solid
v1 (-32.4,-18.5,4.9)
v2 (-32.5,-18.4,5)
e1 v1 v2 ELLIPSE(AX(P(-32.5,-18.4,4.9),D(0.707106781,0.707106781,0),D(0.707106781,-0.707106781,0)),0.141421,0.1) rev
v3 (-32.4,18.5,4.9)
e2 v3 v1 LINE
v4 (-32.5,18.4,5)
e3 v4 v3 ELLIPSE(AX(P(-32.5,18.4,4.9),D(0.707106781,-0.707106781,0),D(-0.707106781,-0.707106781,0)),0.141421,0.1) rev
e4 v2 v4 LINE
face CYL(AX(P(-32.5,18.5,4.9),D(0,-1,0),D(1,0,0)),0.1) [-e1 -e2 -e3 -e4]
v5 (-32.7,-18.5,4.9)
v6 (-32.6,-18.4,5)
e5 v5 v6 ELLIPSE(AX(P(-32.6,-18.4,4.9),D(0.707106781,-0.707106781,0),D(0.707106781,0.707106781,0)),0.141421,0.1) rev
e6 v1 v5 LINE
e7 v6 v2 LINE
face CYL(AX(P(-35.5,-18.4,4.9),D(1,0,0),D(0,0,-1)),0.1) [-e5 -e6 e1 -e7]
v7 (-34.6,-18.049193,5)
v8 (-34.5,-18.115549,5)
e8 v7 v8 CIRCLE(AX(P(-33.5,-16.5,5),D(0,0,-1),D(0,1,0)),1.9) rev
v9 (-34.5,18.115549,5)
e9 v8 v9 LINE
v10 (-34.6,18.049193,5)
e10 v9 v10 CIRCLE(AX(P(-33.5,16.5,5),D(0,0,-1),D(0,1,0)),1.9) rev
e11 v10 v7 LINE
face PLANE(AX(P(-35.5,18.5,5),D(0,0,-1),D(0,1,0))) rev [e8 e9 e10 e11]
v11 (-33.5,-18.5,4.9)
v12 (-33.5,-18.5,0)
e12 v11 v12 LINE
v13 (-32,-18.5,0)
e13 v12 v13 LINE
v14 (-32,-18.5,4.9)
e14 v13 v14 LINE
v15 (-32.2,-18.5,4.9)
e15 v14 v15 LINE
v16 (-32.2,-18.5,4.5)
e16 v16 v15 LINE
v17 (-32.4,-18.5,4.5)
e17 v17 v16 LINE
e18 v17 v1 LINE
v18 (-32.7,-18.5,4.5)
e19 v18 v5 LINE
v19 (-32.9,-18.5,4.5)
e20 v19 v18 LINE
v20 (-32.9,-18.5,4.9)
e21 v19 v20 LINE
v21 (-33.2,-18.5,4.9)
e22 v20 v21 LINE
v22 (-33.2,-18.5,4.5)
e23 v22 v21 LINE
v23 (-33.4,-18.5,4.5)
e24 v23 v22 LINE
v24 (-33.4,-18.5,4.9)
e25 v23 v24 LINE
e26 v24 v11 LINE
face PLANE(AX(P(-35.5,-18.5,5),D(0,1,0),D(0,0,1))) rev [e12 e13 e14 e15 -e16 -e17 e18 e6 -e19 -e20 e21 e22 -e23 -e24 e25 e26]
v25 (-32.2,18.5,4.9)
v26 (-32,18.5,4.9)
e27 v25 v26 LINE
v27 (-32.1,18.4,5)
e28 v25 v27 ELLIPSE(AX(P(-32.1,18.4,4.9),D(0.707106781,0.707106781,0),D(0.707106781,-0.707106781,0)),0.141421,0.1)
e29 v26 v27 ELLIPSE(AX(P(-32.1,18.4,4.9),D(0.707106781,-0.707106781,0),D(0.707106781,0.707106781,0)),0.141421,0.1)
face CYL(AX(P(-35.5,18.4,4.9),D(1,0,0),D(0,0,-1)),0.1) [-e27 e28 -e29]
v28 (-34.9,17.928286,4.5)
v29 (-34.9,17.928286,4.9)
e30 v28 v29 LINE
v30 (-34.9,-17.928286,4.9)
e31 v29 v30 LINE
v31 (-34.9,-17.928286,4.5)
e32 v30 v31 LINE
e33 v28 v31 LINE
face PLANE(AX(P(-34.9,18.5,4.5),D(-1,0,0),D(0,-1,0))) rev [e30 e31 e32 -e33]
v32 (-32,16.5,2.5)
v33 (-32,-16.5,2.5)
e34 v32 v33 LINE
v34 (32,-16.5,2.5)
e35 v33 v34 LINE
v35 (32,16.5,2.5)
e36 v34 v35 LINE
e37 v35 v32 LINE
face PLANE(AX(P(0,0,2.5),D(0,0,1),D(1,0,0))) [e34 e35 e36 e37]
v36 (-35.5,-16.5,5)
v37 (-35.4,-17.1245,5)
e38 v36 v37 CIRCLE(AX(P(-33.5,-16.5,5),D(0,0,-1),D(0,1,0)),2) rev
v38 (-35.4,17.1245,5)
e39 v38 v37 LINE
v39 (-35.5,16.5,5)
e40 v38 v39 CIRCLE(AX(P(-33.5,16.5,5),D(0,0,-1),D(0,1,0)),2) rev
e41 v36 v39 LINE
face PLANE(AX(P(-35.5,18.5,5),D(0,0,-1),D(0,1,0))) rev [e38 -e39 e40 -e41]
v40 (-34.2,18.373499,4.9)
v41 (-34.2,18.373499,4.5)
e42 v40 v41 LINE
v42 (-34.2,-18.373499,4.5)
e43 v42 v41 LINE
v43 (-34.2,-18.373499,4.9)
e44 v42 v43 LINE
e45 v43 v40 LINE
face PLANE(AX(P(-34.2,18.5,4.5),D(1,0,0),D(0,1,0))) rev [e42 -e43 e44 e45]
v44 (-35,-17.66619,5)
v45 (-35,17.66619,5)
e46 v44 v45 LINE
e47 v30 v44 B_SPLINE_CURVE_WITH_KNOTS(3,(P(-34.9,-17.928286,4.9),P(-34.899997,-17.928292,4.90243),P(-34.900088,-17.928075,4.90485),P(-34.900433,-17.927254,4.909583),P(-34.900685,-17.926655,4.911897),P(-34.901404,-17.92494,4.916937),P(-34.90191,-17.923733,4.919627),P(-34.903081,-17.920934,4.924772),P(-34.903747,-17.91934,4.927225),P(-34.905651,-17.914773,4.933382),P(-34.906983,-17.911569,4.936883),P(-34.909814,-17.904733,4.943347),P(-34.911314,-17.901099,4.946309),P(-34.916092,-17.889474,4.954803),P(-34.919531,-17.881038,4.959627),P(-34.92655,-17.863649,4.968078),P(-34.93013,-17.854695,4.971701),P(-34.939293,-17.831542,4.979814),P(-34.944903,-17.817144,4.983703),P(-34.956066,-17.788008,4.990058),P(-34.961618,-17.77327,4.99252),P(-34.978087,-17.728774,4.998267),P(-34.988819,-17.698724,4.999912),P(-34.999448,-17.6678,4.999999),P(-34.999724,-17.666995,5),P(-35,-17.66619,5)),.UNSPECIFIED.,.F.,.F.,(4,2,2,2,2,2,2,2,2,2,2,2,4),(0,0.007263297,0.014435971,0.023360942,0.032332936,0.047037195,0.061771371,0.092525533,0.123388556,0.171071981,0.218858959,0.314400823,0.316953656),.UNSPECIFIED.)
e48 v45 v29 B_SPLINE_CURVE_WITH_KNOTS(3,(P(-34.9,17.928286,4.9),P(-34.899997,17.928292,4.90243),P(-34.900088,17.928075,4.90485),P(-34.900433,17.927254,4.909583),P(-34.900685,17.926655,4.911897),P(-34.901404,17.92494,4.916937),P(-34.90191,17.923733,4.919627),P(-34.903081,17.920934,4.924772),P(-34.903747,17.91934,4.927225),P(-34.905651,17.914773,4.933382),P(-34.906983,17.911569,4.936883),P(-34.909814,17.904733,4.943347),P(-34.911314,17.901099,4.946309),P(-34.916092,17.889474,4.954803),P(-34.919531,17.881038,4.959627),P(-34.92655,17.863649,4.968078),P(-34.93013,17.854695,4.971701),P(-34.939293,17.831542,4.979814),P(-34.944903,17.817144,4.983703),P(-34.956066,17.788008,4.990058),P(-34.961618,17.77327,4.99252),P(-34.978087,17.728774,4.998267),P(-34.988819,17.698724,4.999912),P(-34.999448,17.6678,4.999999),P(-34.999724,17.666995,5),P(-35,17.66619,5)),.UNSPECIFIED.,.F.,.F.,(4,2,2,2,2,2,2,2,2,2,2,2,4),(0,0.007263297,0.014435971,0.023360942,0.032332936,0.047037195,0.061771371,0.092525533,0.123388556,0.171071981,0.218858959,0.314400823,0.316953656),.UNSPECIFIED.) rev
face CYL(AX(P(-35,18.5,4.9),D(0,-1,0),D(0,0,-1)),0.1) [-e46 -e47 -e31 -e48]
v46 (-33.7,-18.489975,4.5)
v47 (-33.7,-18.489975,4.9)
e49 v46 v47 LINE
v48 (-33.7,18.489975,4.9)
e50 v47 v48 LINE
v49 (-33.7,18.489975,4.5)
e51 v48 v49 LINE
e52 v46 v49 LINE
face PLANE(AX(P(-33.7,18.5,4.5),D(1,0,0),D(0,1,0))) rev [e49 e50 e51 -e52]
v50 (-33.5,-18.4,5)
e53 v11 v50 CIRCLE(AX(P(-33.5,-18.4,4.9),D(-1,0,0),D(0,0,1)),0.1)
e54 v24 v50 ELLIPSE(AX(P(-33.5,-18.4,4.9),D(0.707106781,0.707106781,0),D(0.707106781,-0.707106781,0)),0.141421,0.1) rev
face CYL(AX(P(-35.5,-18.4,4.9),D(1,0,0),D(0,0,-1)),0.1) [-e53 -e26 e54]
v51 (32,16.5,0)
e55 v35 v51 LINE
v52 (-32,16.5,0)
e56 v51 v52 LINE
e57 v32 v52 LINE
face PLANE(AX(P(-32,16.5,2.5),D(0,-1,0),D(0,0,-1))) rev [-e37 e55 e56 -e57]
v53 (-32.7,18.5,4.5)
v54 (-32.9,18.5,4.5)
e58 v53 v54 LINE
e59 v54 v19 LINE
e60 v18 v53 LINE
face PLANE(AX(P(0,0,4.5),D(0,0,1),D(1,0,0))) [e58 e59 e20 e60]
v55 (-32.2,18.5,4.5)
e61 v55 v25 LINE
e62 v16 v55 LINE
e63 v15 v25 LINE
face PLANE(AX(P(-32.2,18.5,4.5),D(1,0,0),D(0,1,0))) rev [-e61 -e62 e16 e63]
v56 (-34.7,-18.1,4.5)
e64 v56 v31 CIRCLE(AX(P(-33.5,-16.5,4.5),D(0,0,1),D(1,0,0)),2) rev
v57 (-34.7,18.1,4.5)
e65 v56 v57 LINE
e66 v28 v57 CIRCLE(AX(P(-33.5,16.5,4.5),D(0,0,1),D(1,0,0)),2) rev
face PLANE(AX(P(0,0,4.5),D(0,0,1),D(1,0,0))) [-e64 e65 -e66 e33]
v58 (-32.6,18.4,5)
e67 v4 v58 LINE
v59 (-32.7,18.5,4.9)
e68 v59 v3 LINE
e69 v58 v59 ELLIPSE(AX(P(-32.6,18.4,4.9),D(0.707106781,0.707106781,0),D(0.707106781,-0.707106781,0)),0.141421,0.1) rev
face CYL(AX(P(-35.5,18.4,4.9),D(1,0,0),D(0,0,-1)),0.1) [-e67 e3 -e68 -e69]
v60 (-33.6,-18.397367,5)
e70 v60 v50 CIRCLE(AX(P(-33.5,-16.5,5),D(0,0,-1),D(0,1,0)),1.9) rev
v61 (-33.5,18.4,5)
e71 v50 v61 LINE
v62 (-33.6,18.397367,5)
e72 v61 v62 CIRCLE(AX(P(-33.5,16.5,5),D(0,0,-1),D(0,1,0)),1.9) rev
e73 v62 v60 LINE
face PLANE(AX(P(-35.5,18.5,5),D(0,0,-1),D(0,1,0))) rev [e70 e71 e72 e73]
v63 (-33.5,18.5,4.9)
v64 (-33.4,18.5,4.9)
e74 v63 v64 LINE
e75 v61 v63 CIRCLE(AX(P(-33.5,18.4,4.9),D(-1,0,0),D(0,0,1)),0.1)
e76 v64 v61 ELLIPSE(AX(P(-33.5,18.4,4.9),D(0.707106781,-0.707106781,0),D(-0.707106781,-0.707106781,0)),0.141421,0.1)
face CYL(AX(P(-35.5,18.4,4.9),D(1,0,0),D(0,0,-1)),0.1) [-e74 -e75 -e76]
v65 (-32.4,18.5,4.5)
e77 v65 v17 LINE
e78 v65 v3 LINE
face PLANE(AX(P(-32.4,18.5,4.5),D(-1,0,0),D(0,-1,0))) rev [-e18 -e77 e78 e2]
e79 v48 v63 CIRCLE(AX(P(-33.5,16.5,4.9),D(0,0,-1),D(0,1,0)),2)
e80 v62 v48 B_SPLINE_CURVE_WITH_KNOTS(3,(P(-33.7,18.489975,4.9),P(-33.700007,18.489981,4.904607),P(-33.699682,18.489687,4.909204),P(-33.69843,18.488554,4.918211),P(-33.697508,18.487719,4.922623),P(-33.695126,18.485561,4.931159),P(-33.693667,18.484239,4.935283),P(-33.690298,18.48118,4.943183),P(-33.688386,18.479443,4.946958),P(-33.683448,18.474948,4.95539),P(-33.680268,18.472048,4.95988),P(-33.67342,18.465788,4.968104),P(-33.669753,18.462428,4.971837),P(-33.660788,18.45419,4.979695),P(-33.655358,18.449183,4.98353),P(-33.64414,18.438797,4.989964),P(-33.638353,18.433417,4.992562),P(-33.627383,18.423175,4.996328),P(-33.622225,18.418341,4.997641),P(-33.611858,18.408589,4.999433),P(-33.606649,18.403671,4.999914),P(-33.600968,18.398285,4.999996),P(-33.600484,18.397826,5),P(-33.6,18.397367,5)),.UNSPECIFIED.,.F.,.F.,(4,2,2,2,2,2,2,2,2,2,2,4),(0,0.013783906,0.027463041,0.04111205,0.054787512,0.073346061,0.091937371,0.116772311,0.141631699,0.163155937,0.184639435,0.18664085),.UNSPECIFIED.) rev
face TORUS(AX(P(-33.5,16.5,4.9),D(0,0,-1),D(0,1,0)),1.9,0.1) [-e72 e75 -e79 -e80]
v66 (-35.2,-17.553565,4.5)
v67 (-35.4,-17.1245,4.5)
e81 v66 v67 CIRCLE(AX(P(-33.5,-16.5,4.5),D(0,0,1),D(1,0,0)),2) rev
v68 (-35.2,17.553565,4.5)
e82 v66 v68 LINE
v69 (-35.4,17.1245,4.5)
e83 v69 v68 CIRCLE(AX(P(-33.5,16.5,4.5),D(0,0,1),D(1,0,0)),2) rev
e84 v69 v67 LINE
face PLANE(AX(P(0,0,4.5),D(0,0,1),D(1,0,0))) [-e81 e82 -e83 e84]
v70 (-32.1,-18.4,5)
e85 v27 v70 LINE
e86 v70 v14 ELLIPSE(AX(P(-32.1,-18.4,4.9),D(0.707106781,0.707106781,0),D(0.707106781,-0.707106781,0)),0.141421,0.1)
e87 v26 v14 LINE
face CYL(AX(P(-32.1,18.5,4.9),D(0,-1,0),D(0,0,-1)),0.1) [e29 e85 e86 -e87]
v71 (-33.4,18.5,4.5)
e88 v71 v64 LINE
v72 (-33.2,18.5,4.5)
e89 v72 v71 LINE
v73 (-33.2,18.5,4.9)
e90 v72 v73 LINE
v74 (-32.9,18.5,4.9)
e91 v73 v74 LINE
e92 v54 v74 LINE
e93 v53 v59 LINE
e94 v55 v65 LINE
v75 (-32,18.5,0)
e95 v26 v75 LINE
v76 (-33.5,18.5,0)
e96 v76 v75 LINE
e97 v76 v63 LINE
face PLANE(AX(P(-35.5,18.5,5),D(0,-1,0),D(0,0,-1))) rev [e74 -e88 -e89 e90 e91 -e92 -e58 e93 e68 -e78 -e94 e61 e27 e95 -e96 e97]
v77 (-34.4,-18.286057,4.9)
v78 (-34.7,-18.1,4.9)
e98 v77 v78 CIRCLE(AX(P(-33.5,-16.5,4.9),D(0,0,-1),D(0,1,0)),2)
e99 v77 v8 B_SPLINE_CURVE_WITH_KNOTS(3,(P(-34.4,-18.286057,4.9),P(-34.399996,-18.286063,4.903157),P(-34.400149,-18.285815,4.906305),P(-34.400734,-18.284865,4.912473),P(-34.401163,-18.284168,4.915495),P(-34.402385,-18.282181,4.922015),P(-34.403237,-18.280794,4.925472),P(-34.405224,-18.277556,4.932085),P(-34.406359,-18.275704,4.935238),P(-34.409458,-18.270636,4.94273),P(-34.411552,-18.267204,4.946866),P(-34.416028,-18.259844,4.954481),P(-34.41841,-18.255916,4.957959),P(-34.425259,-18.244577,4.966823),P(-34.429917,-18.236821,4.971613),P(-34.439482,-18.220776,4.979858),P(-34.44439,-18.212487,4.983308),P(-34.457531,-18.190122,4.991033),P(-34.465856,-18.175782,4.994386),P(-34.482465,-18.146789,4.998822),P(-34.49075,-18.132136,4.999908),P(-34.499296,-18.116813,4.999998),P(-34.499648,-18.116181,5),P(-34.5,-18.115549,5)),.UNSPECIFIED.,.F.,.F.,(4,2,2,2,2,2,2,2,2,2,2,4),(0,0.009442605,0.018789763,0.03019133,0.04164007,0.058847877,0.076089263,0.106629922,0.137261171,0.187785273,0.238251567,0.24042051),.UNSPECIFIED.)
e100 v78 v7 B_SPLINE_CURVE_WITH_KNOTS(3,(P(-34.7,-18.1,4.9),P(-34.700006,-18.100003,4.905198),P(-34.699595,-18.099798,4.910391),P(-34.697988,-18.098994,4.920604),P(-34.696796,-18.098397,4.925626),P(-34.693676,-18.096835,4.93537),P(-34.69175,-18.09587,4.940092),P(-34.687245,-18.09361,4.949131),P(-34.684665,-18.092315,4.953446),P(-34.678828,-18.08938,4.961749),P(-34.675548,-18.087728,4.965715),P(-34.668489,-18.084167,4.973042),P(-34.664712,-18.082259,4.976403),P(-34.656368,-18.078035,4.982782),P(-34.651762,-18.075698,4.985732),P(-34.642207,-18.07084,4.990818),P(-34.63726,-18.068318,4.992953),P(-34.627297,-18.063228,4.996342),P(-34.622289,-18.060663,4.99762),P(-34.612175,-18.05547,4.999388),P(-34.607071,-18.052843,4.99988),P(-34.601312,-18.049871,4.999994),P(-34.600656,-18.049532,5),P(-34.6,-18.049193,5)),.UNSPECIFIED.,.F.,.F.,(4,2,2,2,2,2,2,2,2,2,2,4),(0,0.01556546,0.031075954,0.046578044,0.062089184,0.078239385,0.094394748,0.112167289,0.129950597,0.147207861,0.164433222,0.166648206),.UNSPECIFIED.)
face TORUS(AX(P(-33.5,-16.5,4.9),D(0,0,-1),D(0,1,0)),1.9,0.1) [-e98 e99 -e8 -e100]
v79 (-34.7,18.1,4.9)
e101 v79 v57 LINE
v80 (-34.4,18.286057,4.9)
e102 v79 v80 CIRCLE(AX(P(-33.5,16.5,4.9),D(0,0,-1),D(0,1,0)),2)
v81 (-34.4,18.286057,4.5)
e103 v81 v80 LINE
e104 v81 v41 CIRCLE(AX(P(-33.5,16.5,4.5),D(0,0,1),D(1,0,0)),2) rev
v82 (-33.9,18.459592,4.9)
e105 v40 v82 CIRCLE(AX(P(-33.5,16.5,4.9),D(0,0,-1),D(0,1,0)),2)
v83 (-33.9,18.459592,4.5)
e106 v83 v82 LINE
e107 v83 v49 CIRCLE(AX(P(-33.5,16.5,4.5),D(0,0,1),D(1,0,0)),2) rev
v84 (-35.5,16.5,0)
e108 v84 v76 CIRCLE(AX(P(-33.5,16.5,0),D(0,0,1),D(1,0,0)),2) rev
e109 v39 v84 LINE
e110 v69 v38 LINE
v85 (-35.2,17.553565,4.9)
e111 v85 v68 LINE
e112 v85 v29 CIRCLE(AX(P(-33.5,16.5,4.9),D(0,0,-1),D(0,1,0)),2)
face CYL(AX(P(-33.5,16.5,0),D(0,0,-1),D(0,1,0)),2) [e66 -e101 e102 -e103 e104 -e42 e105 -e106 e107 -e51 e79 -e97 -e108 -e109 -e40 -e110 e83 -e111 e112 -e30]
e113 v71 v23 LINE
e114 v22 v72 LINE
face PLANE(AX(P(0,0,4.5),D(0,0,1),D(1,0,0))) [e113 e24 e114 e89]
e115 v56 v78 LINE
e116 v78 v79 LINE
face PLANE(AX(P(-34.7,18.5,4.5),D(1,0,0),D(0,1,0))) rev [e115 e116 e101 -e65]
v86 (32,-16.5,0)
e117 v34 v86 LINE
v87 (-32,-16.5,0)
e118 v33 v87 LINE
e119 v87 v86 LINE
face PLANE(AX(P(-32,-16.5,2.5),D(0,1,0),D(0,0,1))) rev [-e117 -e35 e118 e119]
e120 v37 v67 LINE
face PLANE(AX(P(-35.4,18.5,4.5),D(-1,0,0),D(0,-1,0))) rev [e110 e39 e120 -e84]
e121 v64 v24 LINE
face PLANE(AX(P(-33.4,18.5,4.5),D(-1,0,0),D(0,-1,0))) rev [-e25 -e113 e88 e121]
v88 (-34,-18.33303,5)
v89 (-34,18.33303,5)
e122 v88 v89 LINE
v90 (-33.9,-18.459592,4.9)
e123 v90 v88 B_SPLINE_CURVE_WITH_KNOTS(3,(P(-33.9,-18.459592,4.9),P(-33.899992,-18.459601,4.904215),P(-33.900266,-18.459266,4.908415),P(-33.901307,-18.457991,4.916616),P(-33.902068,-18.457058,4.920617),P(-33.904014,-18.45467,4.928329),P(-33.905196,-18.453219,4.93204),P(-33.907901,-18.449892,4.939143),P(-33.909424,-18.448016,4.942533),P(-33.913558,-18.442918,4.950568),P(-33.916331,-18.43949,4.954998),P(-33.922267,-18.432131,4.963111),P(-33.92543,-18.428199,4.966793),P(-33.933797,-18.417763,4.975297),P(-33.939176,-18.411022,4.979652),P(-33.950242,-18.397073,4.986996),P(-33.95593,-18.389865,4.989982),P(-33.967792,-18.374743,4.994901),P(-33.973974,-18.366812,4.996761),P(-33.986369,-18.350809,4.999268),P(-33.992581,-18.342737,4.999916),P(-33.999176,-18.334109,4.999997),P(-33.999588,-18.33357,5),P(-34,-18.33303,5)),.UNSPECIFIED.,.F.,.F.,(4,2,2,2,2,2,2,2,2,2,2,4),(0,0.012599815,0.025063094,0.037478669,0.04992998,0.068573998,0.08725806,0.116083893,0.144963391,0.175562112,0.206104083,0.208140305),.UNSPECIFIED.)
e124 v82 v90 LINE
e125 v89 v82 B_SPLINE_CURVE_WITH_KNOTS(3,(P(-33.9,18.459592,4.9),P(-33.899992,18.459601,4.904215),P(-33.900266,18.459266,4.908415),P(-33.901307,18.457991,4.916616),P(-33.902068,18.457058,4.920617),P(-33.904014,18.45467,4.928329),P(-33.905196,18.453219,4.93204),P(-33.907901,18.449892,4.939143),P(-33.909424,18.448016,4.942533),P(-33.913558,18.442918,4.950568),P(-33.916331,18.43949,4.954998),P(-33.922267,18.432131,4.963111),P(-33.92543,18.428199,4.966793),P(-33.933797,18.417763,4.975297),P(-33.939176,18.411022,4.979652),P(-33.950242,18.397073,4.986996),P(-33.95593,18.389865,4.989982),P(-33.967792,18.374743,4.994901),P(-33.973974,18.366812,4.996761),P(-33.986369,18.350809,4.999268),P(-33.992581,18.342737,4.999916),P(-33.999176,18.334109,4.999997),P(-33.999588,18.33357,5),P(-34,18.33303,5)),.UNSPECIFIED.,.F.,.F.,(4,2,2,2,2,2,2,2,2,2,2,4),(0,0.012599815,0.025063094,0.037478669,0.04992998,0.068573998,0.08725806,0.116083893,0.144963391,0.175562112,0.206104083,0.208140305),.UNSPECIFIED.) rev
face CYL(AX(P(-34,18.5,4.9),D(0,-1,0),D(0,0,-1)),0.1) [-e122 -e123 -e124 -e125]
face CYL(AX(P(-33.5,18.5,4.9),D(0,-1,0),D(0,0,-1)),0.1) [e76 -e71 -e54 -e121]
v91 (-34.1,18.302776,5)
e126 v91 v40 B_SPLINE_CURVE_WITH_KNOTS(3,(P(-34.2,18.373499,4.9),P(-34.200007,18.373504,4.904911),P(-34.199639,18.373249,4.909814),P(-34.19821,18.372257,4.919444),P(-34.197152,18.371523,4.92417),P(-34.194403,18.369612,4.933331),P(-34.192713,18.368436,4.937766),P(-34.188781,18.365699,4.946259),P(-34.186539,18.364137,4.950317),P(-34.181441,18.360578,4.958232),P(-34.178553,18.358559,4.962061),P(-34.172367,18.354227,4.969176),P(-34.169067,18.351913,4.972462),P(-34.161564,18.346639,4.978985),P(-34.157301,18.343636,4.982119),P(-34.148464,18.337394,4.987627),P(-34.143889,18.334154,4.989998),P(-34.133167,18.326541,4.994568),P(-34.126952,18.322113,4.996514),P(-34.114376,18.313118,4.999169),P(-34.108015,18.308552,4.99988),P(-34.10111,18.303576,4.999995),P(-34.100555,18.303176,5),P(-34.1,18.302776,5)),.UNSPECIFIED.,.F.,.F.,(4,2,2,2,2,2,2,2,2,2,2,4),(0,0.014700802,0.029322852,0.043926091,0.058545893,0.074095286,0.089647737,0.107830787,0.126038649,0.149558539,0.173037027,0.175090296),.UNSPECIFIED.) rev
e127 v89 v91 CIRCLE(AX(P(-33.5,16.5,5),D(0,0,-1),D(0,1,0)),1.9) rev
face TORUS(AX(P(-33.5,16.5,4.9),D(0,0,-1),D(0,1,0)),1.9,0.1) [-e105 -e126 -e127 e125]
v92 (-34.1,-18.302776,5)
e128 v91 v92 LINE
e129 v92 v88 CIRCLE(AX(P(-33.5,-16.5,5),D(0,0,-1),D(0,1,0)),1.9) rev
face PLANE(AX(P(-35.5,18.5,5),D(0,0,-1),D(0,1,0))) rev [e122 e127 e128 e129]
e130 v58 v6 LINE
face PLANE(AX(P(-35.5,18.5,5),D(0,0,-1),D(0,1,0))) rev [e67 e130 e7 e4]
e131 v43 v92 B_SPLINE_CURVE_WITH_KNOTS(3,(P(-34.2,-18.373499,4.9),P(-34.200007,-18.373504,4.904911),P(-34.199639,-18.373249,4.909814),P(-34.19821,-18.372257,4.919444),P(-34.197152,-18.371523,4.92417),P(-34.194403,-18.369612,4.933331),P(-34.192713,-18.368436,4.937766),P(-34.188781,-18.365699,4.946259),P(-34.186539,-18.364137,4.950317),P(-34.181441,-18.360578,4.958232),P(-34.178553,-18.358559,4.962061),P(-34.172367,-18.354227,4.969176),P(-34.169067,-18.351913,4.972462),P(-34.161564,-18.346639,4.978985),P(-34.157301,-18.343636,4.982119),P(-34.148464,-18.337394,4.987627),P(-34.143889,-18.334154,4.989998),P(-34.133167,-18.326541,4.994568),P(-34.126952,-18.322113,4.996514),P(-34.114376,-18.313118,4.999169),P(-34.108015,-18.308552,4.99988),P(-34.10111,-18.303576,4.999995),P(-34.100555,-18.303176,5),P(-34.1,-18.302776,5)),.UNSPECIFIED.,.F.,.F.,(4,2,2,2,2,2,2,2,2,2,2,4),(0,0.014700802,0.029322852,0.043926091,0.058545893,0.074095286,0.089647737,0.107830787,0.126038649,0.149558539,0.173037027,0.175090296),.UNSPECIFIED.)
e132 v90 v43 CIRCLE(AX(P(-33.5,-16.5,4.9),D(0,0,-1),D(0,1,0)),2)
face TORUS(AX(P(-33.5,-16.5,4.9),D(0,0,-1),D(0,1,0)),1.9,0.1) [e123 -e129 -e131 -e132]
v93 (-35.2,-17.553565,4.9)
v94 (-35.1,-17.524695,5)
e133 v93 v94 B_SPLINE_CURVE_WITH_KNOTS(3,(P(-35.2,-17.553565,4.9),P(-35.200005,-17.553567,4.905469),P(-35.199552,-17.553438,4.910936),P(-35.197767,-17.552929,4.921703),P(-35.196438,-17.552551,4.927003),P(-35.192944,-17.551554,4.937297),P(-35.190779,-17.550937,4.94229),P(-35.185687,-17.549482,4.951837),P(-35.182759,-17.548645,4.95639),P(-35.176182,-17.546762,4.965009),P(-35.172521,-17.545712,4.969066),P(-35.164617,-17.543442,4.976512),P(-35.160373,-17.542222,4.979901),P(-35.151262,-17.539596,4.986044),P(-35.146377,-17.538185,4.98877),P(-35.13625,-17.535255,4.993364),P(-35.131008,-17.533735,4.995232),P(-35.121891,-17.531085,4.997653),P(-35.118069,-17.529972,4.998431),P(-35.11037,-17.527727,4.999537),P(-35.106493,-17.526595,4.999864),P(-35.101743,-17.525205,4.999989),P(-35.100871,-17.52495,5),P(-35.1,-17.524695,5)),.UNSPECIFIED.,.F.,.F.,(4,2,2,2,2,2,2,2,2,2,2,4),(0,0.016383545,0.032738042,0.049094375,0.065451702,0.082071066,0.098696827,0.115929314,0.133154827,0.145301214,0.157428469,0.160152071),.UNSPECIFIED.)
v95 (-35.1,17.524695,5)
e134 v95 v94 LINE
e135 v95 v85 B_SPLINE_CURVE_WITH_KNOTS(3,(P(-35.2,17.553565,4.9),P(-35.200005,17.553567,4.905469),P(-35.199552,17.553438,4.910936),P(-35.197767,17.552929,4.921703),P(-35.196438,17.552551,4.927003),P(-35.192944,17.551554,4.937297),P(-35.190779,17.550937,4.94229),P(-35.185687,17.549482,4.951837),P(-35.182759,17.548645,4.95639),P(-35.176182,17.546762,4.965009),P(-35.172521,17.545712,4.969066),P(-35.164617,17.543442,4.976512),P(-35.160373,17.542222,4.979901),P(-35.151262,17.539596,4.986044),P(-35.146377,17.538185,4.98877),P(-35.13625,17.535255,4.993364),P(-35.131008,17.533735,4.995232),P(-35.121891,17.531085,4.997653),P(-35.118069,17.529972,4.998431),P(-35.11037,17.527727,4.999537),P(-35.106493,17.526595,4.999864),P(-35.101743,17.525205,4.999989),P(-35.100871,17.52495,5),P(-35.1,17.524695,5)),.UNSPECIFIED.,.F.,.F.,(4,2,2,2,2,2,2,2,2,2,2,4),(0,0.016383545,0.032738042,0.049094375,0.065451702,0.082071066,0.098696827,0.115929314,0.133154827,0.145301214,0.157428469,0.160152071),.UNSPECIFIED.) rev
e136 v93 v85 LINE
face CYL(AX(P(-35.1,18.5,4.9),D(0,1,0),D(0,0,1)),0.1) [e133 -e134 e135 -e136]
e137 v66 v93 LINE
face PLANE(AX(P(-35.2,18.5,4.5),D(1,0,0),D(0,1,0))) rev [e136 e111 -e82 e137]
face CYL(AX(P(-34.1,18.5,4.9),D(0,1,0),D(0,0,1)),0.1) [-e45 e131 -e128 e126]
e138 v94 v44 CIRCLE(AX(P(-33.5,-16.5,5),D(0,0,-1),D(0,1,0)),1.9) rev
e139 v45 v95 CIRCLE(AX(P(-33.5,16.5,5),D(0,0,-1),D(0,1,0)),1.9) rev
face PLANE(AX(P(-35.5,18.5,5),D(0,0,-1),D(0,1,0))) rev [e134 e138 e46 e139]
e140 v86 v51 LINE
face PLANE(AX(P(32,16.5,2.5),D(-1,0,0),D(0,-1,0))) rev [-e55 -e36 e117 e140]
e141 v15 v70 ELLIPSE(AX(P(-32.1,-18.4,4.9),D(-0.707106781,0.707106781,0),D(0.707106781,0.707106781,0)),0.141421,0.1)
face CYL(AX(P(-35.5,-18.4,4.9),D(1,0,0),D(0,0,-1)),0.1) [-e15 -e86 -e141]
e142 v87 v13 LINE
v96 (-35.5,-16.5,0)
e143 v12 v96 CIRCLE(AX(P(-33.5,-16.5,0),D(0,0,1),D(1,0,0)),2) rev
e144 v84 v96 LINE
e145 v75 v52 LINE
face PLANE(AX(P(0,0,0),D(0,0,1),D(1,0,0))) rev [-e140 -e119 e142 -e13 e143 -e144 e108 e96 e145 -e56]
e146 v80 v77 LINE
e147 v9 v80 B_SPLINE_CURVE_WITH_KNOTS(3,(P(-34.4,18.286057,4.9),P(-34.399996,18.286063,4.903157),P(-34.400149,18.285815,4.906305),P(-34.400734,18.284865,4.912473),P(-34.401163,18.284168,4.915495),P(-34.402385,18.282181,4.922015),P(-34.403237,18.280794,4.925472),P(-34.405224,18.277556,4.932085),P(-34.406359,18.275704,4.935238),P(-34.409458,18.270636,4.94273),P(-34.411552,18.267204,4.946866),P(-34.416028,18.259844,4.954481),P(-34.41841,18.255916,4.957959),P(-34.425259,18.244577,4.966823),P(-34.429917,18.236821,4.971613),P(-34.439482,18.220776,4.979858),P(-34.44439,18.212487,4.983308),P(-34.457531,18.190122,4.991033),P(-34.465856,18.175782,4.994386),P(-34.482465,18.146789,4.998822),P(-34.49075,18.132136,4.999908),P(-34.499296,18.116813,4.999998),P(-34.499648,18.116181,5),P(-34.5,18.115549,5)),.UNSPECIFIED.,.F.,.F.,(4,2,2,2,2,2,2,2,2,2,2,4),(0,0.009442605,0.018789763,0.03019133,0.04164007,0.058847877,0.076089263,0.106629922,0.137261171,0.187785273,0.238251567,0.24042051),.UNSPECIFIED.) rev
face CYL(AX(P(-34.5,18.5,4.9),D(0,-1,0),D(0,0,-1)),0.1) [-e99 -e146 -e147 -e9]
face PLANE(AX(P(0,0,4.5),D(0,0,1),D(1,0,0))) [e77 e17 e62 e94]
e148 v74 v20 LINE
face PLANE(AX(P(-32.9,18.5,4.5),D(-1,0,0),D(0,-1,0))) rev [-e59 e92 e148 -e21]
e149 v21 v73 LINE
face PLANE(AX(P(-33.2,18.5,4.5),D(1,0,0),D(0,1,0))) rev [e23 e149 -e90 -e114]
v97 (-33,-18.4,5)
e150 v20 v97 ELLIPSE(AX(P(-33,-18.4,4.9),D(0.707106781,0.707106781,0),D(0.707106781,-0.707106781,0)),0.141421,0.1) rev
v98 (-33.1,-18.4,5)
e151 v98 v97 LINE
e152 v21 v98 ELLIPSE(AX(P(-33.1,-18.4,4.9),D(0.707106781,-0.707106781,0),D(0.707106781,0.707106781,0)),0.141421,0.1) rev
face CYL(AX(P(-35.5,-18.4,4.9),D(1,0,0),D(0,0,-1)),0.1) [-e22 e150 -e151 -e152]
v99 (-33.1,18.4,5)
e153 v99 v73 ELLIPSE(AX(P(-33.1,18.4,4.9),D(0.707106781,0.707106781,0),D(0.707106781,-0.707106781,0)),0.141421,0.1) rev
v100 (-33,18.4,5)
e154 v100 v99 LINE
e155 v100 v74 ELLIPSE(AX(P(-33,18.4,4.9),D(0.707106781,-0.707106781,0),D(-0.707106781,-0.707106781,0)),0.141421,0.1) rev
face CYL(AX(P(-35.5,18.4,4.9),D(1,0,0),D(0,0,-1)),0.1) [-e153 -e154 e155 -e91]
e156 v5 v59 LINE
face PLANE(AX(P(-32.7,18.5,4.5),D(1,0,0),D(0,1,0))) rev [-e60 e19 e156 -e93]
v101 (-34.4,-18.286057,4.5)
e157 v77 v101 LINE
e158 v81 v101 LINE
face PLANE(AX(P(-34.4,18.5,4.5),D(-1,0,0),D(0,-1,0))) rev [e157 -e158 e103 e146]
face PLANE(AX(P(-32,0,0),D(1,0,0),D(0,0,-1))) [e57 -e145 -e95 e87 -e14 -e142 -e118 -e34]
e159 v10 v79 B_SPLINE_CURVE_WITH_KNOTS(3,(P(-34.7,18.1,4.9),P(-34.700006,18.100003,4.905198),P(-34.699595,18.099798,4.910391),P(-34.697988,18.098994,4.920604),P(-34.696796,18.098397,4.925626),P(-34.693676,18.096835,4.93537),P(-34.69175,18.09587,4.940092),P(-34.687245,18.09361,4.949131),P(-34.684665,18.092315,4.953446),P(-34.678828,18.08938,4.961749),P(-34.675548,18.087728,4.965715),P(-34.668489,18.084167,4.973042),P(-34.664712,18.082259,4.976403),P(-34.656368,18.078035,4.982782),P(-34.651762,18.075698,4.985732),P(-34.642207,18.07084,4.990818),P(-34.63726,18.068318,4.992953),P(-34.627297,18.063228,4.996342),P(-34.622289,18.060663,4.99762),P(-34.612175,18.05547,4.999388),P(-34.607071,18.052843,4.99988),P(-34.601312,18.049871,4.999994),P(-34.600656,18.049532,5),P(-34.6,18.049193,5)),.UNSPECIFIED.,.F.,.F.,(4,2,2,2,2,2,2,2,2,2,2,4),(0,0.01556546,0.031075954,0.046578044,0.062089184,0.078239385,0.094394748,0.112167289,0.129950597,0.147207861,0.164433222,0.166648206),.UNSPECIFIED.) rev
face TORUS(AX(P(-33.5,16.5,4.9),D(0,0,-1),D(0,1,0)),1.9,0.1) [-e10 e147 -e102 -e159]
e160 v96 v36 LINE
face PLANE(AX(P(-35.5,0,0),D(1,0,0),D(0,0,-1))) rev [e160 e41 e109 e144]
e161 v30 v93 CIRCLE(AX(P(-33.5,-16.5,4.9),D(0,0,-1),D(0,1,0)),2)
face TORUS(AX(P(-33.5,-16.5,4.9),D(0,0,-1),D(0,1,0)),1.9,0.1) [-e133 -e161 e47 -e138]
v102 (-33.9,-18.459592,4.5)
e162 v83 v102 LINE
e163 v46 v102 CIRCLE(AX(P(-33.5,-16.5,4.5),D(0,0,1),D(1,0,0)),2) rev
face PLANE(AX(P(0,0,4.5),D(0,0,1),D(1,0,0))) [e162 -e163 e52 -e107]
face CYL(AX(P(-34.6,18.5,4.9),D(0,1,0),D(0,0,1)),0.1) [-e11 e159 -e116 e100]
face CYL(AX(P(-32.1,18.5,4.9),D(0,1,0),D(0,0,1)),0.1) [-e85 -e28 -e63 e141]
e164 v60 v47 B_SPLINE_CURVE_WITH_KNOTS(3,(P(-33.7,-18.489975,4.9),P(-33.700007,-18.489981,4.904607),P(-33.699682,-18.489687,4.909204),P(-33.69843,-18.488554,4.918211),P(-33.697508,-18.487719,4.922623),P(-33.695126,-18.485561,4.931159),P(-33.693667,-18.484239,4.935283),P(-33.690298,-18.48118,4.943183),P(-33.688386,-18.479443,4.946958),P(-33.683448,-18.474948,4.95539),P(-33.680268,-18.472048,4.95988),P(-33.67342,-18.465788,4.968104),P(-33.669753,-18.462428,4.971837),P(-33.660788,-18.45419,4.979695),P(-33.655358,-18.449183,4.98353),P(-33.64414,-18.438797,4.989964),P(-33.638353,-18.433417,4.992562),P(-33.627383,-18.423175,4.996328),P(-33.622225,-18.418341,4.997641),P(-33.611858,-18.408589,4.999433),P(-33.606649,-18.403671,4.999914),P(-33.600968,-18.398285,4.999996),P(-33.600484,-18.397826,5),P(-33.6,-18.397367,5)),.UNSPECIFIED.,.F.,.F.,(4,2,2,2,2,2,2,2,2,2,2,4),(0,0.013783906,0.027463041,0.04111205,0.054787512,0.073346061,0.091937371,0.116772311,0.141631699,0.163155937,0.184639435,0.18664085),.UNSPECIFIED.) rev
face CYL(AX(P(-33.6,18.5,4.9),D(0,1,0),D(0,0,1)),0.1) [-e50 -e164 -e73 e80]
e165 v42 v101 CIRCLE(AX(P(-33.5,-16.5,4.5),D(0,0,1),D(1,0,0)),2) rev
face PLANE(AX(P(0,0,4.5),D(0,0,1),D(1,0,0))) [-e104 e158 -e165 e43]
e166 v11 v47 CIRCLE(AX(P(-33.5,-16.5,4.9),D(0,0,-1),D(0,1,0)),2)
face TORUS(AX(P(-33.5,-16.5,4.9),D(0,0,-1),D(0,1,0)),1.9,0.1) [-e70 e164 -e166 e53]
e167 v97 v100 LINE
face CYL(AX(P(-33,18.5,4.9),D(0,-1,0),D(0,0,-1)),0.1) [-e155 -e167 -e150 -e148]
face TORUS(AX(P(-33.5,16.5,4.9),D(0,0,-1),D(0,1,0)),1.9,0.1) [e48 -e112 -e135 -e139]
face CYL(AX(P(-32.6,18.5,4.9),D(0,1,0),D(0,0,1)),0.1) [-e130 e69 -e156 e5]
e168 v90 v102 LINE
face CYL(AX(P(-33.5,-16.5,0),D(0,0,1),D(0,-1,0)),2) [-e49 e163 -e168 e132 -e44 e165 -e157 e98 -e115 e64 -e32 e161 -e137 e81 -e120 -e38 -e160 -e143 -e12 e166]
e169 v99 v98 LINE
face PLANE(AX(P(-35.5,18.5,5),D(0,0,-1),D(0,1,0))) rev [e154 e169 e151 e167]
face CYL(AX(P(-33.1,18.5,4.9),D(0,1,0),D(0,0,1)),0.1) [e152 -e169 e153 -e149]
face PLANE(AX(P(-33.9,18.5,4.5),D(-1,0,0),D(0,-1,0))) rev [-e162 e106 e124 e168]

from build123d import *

# Parameters (mm, degrees)
CROQUIS1_W              = 64
CROQUIS1_H              = 33
SALIENTE_EXTRUIR1_DEPTH = 2.5
CROQUIS3_W              = 5
CROQUIS3_H              = 37
SALIENTE_EXTRUIR2_DEPTH = 3.5
REDONDEO1_R             = 2
CROQUIS4_W              = 0.2
CROQUIS4_H              = 37
CORTAR_EXTRUIR1_DEPTH   = 0.5
REDONDEO2_R             = 0.1


with BuildPart() as part:
    # Croquis1 → Saliente-Extruir1 (new body)
    with BuildSketch(Plane.XY):
        Rectangle(CROQUIS1_W, CROQUIS1_H)
    extrude(amount=SALIENTE_EXTRUIR1_DEPTH)

    # Croquis3 → Saliente-Extruir2 (add)
    with BuildSketch(Plane.ZY.offset(32)):
        with Locations((2.5, 0)):
            Rectangle(CROQUIS3_W, CROQUIS3_H)
    extrude(amount=SALIENTE_EXTRUIR2_DEPTH)

    # Redondeo1
    redondeo1_edges = [part.edges().sort_by_distance(p)[0] for p in [
        (-35.5, 18.5, 2.5),
        (-35.5, -18.5, 2.5),
    ]]
    fillet(redondeo1_edges, radius=REDONDEO1_R)

    # Croquis4 → Cortar-Extruir1 (cut)
    with BuildSketch(Plane.XY.offset(5)):
        with Locations((-32.3, 0)):
            Rectangle(CROQUIS4_W, CROQUIS4_H)
        with Locations((-32.8, 0)):
            Rectangle(CROQUIS4_W, CROQUIS4_H)
        with Locations((-33.3, 0)):
            Rectangle(CROQUIS4_W, CROQUIS4_H)
        with Locations((-33.8, 0)):
            Rectangle(CROQUIS4_W, CROQUIS4_H)
        with Locations((-34.3, 0)):
            Rectangle(CROQUIS4_W, CROQUIS4_H)
        with Locations((-34.8, 0)):
            Rectangle(CROQUIS4_W, CROQUIS4_H)
        with Locations((-35.3, 0)):
            Rectangle(CROQUIS4_W, CROQUIS4_H)
    extrude(amount=-CORTAR_EXTRUIR1_DEPTH, mode=Mode.SUBTRACT)

    # Redondeo2
    redondeo2_edges = [part.edges().sort_by_distance(p)[0] for p in [
        (-34.2, 0, 5),
        (-34.4, 0, 5),
        (-34.7, 0, 5),
        (-34.9, 0, 5),
        (-35.2, 0, 5),
        (-32, 0, 5),
        (-33.45, 18.5, 5),
        (-33.45, -18.5, 5),
        (-33.60012555, 18.497492146, 5),
        (-34.051681951, 18.422406571, 5),
        (-34.554113045, 18.199660463, 5),
        (-35.061282751, 17.749958468, 5),
        (-35.061282751, -17.749958468, 5),
        (-34.554113045, -18.199660463, 5),
        (-34.051681951, -18.422406571, 5),
        (-33.60012555, -18.497492146, 5),
        (-33.05, -18.5, 5),
        (-32.55, -18.5, 5),
        (-32.1, -18.5, 5),
        (-33.05, 18.5, 5),
        (-32.55, 18.5, 5),
        (-32.1, 18.5, 5),
        (-32.4, 0, 5),
        (-32.2, 0, 5),
        (-32.9, 0, 5),
        (-32.7, 0, 5),
        (-33.4, 0, 5),
        (-33.2, 0, 5),
        (-33.7, 0, 5),
        (-33.9, 0, 5),
    ]]
    fillet(redondeo2_edges, radius=REDONDEO2_R - 0.0001)  # a hair under: the kernel refuses the full size


solid = part.part
